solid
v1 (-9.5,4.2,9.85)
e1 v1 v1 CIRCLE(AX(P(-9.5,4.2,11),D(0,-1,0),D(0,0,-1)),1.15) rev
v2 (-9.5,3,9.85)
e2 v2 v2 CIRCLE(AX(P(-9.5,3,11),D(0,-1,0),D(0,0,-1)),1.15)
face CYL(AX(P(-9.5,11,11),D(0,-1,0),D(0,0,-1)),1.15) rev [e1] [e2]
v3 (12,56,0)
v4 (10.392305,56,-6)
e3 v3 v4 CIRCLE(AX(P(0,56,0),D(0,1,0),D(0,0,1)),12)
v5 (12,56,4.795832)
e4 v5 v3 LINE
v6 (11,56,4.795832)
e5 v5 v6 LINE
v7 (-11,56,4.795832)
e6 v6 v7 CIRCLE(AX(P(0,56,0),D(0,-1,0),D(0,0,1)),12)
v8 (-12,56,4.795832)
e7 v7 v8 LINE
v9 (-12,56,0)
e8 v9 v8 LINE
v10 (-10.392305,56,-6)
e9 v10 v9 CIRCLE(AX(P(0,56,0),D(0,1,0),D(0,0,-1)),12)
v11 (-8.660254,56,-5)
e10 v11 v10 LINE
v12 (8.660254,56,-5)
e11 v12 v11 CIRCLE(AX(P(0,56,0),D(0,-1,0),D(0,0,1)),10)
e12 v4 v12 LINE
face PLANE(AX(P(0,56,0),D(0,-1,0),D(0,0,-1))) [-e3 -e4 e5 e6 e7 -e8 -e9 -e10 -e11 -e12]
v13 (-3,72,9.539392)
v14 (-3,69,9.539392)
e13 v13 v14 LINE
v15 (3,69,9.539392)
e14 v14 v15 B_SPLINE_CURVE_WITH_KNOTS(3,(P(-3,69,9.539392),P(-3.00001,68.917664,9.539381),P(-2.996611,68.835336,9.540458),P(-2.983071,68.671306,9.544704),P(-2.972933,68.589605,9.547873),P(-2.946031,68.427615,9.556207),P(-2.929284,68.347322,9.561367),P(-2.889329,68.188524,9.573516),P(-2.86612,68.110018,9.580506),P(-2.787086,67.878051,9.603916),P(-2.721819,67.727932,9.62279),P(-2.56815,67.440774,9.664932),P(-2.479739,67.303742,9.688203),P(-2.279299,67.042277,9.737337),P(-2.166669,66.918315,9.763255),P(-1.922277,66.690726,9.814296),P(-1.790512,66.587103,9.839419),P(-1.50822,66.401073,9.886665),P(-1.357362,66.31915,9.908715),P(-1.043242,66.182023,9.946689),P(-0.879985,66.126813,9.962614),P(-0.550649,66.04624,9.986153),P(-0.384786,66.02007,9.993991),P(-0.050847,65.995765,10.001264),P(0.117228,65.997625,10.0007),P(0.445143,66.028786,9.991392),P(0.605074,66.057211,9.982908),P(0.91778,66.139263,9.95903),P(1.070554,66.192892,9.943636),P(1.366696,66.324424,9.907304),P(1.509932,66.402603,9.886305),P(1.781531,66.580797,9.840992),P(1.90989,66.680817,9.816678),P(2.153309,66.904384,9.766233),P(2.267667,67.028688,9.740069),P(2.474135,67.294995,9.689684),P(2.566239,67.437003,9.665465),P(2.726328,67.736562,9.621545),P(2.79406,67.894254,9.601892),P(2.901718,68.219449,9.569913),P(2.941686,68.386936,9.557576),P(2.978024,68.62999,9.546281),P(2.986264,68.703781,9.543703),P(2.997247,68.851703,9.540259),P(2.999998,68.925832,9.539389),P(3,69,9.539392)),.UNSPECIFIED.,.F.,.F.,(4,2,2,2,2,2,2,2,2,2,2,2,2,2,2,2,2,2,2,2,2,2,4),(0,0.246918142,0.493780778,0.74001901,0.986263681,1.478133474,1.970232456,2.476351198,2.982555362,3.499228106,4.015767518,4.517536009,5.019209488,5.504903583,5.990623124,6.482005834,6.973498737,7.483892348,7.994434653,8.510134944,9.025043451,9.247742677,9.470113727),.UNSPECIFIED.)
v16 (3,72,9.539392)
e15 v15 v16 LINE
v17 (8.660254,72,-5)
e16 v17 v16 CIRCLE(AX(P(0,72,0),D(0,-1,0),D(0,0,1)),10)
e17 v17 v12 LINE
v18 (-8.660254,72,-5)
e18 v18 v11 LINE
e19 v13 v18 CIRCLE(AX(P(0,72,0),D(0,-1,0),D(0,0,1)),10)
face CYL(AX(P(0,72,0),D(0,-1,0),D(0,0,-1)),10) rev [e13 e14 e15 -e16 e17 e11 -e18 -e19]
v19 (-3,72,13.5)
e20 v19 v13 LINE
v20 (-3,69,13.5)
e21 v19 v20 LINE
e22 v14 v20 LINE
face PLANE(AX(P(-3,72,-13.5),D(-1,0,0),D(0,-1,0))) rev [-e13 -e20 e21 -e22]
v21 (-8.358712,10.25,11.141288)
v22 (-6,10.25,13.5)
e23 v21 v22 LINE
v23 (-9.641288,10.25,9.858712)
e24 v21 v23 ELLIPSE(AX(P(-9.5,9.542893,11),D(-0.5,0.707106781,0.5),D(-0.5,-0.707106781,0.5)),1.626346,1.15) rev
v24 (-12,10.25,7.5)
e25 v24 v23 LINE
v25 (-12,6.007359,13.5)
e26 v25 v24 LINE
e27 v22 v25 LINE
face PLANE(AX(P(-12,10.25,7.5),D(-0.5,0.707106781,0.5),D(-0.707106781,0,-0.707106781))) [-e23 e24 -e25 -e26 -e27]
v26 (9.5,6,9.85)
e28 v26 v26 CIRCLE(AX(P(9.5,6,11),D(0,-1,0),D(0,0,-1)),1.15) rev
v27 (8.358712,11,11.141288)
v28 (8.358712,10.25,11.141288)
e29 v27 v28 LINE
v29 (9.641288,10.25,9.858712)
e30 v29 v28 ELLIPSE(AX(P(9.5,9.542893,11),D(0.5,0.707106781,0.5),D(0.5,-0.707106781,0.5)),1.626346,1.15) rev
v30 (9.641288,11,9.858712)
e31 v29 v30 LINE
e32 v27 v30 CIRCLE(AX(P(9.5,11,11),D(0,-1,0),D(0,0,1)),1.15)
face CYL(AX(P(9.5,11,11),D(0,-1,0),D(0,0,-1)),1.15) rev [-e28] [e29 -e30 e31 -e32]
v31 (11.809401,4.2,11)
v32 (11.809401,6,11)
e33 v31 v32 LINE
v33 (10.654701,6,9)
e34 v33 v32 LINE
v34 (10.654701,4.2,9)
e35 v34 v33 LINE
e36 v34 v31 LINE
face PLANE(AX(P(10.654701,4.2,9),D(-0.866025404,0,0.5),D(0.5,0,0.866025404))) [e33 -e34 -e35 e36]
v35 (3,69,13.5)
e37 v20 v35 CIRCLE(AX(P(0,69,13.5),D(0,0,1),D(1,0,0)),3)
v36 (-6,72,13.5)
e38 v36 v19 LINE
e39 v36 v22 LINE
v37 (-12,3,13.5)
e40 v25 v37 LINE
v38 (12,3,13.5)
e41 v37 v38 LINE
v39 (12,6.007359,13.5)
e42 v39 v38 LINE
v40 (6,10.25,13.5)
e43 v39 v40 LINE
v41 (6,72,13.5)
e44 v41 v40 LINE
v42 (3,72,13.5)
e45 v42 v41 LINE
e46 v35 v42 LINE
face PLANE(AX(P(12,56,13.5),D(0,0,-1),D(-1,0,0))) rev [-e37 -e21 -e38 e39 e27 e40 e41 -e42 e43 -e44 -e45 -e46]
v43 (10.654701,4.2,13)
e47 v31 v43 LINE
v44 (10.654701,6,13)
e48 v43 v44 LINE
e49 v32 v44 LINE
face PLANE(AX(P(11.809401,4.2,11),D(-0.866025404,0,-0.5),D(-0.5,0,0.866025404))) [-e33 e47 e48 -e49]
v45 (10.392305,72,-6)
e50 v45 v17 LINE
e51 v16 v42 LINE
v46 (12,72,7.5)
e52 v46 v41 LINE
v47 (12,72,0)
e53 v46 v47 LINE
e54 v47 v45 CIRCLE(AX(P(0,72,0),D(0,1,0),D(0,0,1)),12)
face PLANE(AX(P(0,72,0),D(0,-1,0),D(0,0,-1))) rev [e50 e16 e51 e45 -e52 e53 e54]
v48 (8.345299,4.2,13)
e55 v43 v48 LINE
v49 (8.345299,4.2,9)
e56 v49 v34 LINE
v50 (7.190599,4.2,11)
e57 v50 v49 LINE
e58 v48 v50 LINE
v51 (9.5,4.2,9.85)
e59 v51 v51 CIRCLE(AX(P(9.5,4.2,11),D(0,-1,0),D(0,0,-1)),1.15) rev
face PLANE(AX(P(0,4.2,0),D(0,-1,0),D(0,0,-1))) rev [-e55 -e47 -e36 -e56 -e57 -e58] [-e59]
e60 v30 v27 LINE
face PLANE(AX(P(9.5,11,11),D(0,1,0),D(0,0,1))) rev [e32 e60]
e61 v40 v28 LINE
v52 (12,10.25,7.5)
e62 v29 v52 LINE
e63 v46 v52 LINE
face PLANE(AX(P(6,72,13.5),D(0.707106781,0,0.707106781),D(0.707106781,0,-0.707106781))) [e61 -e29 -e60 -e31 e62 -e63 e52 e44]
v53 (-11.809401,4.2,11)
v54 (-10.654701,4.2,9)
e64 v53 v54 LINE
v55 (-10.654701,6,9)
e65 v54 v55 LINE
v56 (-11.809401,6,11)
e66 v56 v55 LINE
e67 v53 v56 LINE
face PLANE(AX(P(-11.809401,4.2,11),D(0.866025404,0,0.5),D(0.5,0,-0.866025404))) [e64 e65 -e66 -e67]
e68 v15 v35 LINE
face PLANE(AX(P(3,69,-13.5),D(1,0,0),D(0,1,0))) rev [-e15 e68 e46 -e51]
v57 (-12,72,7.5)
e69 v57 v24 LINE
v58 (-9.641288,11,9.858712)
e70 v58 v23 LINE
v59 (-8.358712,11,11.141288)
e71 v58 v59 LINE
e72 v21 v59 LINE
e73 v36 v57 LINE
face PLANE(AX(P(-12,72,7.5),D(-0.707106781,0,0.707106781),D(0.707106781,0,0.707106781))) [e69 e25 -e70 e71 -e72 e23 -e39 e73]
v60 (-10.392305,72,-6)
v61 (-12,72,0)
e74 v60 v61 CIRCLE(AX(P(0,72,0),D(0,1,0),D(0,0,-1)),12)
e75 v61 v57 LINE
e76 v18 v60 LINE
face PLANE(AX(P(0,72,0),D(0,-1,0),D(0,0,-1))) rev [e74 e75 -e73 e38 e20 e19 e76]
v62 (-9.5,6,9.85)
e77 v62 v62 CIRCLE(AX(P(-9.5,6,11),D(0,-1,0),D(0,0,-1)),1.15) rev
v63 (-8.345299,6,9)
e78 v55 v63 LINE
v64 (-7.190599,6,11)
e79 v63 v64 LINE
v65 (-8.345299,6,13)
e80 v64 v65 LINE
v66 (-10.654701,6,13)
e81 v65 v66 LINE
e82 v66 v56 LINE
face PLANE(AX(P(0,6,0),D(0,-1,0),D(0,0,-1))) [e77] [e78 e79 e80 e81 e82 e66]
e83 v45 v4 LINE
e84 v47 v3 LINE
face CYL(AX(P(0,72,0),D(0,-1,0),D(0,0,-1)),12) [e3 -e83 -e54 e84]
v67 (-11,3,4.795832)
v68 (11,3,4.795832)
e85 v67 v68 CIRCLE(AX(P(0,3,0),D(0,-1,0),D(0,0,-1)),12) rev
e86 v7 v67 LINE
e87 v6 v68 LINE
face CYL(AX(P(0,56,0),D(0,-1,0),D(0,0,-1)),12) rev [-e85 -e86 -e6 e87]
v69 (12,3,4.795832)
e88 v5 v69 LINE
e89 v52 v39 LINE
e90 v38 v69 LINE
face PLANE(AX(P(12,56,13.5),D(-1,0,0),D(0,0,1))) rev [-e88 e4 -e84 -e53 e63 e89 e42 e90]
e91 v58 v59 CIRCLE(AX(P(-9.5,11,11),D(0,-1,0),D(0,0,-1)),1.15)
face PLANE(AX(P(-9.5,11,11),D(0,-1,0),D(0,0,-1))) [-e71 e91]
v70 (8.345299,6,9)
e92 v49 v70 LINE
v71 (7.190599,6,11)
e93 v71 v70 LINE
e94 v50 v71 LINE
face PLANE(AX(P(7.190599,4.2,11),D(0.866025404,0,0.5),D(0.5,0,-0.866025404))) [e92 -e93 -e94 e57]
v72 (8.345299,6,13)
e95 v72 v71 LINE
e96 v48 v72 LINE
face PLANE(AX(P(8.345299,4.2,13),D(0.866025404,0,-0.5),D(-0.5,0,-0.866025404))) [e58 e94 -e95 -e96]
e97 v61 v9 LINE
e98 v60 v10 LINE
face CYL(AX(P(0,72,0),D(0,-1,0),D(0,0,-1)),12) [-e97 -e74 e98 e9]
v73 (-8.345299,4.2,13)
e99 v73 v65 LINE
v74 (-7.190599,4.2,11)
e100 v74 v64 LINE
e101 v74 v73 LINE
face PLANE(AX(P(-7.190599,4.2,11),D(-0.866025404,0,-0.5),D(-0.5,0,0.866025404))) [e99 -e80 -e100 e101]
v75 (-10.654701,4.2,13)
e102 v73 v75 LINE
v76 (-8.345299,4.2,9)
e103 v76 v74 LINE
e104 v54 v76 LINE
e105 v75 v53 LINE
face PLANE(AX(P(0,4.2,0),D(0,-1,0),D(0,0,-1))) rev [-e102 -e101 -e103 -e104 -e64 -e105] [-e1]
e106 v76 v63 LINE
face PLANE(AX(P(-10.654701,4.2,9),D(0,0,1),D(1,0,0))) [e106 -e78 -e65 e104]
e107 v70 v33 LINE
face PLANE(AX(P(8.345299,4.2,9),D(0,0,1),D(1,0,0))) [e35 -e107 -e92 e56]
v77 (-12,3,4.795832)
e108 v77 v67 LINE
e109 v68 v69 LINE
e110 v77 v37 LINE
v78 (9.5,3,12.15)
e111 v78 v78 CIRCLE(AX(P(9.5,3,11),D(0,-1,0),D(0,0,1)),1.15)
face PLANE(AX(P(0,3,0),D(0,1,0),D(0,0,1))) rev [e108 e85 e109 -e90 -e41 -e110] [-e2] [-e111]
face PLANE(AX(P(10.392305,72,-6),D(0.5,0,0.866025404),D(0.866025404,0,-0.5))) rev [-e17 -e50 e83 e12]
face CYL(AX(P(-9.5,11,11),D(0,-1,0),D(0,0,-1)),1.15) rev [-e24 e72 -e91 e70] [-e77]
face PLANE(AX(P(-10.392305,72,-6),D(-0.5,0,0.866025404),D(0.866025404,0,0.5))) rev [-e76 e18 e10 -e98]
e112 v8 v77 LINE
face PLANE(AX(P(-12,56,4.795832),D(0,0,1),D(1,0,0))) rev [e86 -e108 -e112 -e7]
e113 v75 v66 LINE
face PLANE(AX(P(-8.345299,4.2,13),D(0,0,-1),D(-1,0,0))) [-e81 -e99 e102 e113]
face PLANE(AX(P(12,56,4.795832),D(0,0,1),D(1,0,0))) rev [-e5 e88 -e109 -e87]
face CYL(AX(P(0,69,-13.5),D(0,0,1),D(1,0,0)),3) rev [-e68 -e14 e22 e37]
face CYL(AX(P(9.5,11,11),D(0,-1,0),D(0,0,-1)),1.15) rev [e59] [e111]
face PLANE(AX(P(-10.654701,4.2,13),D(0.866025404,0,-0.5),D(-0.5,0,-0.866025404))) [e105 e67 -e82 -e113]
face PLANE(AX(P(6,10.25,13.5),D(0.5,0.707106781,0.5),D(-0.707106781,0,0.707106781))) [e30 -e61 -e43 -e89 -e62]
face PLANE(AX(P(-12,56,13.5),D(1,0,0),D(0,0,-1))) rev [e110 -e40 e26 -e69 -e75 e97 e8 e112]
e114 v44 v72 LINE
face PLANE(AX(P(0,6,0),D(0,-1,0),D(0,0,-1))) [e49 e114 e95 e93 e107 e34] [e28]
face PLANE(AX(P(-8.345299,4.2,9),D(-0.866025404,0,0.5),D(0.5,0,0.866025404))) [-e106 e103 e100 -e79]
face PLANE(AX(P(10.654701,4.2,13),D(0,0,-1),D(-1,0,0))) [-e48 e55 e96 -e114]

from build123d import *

# Parameters (mm, degrees)
BOSS_EXTRUDE1_DEPTH      = 56
BOSS_EXTRUDE2_DEPTH      = 16
BOSS_EXTRUDE3_DEPTH      = 3
BOSS_EXTRUDE3_DEPTH_BACK = 8
SKETCH4_W                = 24
SKETCH4_H                = 27
SKETCH5_W                = 28.405044576
SKETCH5_H                = 3.736732925
CUT_EXTRUDE2_DEPTH       = 78.826730626
CUT_EXTRUDE3_DEPTH       = 75.231058305
CUT_EXTRUDE5_DEPTH       = 3
CUT_EXTRUDE5_DEPTH_BACK  = 75.231058305
SKETCH8_W                = 24
SKETCH8_H                = 27
BOSS_EXTRUDE4_DEPTH      = 3
CHAMFER1_SIZE            = 4.25
SKETCH14_R               = 1.15
CUT_EXTRUDE8_DEPTH       = 8
CUT_EXTRUDE9_START       = -3
CUT_EXTRUDE9_DEPTH       = 1.8


with BuildPart() as part:
    # Sketch2 → Boss-Extrude1 (new body)
    with BuildSketch(Plane(origin=(0, 0, 0), x_dir=(1, 0, 0), z_dir=(0, 1, 0))):
        with BuildLine():
            Line((12, -13.5), (-12, -13.5))
            Line((-12, -13.5), (-12, -4.795831523))
            Line((-12, -4.795831523), (-11, -4.795831523))
            ThreePointArc((-11, -4.795831523), (0, -12), (11, -4.795831523))
            Line((11, -4.795831523), (12, -4.795831523))
            Line((12, -4.795831523), (12, -13.5))
        make_face()
    extrude(amount=BOSS_EXTRUDE1_DEPTH)

    # Sketch3 → Boss-Extrude2 (add)
    with BuildSketch(Plane(origin=(0, 56, 0), x_dir=(1, 0, 0), z_dir=(0, 1, 0))):
        with BuildLine():
            Line((-12, -13.5), (12, -13.5))
            Line((12, -13.5), (12, 0))
            ThreePointArc((12, 0), (11.591109915, 3.105828541), (10.392304845, 6))
            Line((10.392304845, 6), (8.660254038, 5))
            ThreePointArc((8.660254038, 5), (0, -10), (-8.660254038, 5))
            Line((-8.660254038, 5), (-10.392304845, 6))
            ThreePointArc((-10.392304845, 6), (-11.591109915, 3.105828541), (-12, 0))
            Line((-12, 0), (-12, -13.5))
        make_face()
    extrude(amount=BOSS_EXTRUDE2_DEPTH)

    # Sketch4 → Boss-Extrude3 (add, two sides: drawn at the far end of the back side and taken through both)
    with BuildSketch(Plane(origin=(0, 0, 0), x_dir=(1, 0, 0), z_dir=(0, 1, 0)).offset(-BOSS_EXTRUDE3_DEPTH_BACK)):
        Rectangle(SKETCH4_W, SKETCH4_H)
    extrude(amount=BOSS_EXTRUDE3_DEPTH + BOSS_EXTRUDE3_DEPTH_BACK)

    # Sketch5 → Cut-Revolve1 (revolve, cut)
    with BuildSketch(Plane(origin=(0, 0, 0), x_dir=(0, 0, -1), z_dir=(1, 0, 0))):
        with Locations((0.702522288, -8.868366462)):
            Rectangle(SKETCH5_W, SKETCH5_H)
    revolve(axis=Axis((0, 72, 13.5), (0, 0, -1)), mode=Mode.SUBTRACT)

    # Sketch6 → Cut-Extrude2 (cut, through all)
    with BuildSketch(Plane.XY.offset(13.5)):
        with BuildLine():
            Line((-3, 72), (-3, 69))
            ThreePointArc((-3, 69), (0, 66), (3, 69))
            Line((3, 69), (3, 72))
            Line((3, 72), (-3, 72))
        make_face()
    extrude(amount=-CUT_EXTRUDE2_DEPTH, mode=Mode.SUBTRACT)

    # Sketch7 → Cut-Extrude3 (cut, through all)
    with BuildSketch(Plane(origin=(0, 0, 0), x_dir=(1, 0, 0), z_dir=(0, 1, 0))):
        Polygon((6, -13.5), (12, -7.5), (12, -13.5), align=None)
        Polygon((-6, -13.5), (-12, -13.5), (-12, -7.5), align=None)
    extrude(amount=CUT_EXTRUDE3_DEPTH, mode=Mode.SUBTRACT)

    # Sketch8 → Cut-Extrude5 (cut, two sides: drawn at the far end of the back side and taken through both)
    with BuildSketch(Plane(origin=(0, 0, 0), x_dir=(1, 0, 0), z_dir=(0, 1, 0)).offset(-CUT_EXTRUDE5_DEPTH_BACK)):
        Rectangle(SKETCH8_W, SKETCH8_H)
    extrude(amount=CUT_EXTRUDE5_DEPTH + CUT_EXTRUDE5_DEPTH_BACK, mode=Mode.SUBTRACT)

    # Sketch13 → Boss-Extrude4 (add)
    with BuildSketch(Plane.XZ.offset(-3)):
        Polygon((-12, 7.5), (-12, 13.5), (-6, 13.5), align=None)
        Polygon((6, 13.5), (12, 13.5), (12, 7.5), align=None)
    extrude(amount=-BOSS_EXTRUDE4_DEPTH)

    # Chamfer1
    # the kernel refuses this chamfer: 4.25 mm, written as the material it adds along each edge
    with BuildSketch(Plane(origin=(1.728431539, 6, 21.228431539), x_dir=(-0.7068394360706696, -0.02749587661058644, 0.7068394360706773), z_dir=(-0.7071067811865515, 0, -0.7071067811865437))) as chamfer1_piece_1_section:
        Polygon((CHAMFER1_SIZE * 0.999621916911, CHAMFER1_SIZE * 0.0274958766106), (-CHAMFER1_SIZE * 0.0274958766106, CHAMFER1_SIZE * 0.999621916911), (0, 0), align=None)
    chamfer1_piece_1 = extrude(amount=30.344586772, mode=Mode.PRIVATE)
    chamfer1_piece_1 = split(chamfer1_piece_1, bisect_by=Plane(origin=(-12, 7.617398018, 11.205698206), z_dir=(1, 0, 0)), keep=Keep.TOP, mode=Mode.PRIVATE)
    chamfer1_piece_1 = split(chamfer1_piece_1, bisect_by=Plane(origin=(-9.705698206, 7.617398018, 13.5), z_dir=(0, 0, -1)), keep=Keep.TOP, mode=Mode.PRIVATE)
    add(chamfer1_piece_1)
    with BuildSketch(Plane(origin=(19.728431539, 6, -0.228431539), x_dir=(0.70683943607067, -0.02749587661058643, 0.706839436070677), z_dir=(-0.707106781186551, 0, 0.7071067811865441))) as chamfer1_piece_2_section:
        Polygon((CHAMFER1_SIZE * 0.999621916911, CHAMFER1_SIZE * 0.0274958766106), (-CHAMFER1_SIZE * 0.0274958766106, CHAMFER1_SIZE * 0.999621916911), (0, 0), align=None)
    chamfer1_piece_2 = extrude(amount=30.344586772, mode=Mode.PRIVATE)
    chamfer1_piece_2 = split(chamfer1_piece_2, bisect_by=Plane(origin=(12, 7.617398018, 11.205698206), z_dir=(-1, 0, 0)), keep=Keep.TOP, mode=Mode.PRIVATE)
    chamfer1_piece_2 = split(chamfer1_piece_2, bisect_by=Plane(origin=(9.705698206, 7.617398018, 13.5), z_dir=(0, 0, -1)), keep=Keep.TOP, mode=Mode.PRIVATE)
    add(chamfer1_piece_2)

    # Sketch14 → Cut-Extrude8 (cut)
    with BuildSketch(Plane.XZ.offset(-3)):
        with Locations(Location((-9.5, 11, 0), (0, 0, 270))):
            Circle(SKETCH14_R)
        with Locations(Location((9.5, 11, 0), (0, 0, 277.057128313))):
            Circle(SKETCH14_R)
    extrude(amount=-CUT_EXTRUDE8_DEPTH, mode=Mode.SUBTRACT)

    # Sketch15 → Cut-Extrude9 (cut)
    with BuildSketch(Plane.XZ.offset(-3).offset(CUT_EXTRUDE9_START)):
        Polygon((-7.190598923, 11), (-8.345299462, 13), (-10.654700538, 13), (-11.809401077, 11), (-10.654700538, 9), (-8.345299462, 9), align=None)
        Polygon((11.809401077, 11), (10.654700538, 13), (8.345299462, 13), (7.190598923, 11), (8.345299462, 9), (10.654700538, 9), align=None)
    extrude(amount=CUT_EXTRUDE9_DEPTH, mode=Mode.SUBTRACT)


solid = part.part
